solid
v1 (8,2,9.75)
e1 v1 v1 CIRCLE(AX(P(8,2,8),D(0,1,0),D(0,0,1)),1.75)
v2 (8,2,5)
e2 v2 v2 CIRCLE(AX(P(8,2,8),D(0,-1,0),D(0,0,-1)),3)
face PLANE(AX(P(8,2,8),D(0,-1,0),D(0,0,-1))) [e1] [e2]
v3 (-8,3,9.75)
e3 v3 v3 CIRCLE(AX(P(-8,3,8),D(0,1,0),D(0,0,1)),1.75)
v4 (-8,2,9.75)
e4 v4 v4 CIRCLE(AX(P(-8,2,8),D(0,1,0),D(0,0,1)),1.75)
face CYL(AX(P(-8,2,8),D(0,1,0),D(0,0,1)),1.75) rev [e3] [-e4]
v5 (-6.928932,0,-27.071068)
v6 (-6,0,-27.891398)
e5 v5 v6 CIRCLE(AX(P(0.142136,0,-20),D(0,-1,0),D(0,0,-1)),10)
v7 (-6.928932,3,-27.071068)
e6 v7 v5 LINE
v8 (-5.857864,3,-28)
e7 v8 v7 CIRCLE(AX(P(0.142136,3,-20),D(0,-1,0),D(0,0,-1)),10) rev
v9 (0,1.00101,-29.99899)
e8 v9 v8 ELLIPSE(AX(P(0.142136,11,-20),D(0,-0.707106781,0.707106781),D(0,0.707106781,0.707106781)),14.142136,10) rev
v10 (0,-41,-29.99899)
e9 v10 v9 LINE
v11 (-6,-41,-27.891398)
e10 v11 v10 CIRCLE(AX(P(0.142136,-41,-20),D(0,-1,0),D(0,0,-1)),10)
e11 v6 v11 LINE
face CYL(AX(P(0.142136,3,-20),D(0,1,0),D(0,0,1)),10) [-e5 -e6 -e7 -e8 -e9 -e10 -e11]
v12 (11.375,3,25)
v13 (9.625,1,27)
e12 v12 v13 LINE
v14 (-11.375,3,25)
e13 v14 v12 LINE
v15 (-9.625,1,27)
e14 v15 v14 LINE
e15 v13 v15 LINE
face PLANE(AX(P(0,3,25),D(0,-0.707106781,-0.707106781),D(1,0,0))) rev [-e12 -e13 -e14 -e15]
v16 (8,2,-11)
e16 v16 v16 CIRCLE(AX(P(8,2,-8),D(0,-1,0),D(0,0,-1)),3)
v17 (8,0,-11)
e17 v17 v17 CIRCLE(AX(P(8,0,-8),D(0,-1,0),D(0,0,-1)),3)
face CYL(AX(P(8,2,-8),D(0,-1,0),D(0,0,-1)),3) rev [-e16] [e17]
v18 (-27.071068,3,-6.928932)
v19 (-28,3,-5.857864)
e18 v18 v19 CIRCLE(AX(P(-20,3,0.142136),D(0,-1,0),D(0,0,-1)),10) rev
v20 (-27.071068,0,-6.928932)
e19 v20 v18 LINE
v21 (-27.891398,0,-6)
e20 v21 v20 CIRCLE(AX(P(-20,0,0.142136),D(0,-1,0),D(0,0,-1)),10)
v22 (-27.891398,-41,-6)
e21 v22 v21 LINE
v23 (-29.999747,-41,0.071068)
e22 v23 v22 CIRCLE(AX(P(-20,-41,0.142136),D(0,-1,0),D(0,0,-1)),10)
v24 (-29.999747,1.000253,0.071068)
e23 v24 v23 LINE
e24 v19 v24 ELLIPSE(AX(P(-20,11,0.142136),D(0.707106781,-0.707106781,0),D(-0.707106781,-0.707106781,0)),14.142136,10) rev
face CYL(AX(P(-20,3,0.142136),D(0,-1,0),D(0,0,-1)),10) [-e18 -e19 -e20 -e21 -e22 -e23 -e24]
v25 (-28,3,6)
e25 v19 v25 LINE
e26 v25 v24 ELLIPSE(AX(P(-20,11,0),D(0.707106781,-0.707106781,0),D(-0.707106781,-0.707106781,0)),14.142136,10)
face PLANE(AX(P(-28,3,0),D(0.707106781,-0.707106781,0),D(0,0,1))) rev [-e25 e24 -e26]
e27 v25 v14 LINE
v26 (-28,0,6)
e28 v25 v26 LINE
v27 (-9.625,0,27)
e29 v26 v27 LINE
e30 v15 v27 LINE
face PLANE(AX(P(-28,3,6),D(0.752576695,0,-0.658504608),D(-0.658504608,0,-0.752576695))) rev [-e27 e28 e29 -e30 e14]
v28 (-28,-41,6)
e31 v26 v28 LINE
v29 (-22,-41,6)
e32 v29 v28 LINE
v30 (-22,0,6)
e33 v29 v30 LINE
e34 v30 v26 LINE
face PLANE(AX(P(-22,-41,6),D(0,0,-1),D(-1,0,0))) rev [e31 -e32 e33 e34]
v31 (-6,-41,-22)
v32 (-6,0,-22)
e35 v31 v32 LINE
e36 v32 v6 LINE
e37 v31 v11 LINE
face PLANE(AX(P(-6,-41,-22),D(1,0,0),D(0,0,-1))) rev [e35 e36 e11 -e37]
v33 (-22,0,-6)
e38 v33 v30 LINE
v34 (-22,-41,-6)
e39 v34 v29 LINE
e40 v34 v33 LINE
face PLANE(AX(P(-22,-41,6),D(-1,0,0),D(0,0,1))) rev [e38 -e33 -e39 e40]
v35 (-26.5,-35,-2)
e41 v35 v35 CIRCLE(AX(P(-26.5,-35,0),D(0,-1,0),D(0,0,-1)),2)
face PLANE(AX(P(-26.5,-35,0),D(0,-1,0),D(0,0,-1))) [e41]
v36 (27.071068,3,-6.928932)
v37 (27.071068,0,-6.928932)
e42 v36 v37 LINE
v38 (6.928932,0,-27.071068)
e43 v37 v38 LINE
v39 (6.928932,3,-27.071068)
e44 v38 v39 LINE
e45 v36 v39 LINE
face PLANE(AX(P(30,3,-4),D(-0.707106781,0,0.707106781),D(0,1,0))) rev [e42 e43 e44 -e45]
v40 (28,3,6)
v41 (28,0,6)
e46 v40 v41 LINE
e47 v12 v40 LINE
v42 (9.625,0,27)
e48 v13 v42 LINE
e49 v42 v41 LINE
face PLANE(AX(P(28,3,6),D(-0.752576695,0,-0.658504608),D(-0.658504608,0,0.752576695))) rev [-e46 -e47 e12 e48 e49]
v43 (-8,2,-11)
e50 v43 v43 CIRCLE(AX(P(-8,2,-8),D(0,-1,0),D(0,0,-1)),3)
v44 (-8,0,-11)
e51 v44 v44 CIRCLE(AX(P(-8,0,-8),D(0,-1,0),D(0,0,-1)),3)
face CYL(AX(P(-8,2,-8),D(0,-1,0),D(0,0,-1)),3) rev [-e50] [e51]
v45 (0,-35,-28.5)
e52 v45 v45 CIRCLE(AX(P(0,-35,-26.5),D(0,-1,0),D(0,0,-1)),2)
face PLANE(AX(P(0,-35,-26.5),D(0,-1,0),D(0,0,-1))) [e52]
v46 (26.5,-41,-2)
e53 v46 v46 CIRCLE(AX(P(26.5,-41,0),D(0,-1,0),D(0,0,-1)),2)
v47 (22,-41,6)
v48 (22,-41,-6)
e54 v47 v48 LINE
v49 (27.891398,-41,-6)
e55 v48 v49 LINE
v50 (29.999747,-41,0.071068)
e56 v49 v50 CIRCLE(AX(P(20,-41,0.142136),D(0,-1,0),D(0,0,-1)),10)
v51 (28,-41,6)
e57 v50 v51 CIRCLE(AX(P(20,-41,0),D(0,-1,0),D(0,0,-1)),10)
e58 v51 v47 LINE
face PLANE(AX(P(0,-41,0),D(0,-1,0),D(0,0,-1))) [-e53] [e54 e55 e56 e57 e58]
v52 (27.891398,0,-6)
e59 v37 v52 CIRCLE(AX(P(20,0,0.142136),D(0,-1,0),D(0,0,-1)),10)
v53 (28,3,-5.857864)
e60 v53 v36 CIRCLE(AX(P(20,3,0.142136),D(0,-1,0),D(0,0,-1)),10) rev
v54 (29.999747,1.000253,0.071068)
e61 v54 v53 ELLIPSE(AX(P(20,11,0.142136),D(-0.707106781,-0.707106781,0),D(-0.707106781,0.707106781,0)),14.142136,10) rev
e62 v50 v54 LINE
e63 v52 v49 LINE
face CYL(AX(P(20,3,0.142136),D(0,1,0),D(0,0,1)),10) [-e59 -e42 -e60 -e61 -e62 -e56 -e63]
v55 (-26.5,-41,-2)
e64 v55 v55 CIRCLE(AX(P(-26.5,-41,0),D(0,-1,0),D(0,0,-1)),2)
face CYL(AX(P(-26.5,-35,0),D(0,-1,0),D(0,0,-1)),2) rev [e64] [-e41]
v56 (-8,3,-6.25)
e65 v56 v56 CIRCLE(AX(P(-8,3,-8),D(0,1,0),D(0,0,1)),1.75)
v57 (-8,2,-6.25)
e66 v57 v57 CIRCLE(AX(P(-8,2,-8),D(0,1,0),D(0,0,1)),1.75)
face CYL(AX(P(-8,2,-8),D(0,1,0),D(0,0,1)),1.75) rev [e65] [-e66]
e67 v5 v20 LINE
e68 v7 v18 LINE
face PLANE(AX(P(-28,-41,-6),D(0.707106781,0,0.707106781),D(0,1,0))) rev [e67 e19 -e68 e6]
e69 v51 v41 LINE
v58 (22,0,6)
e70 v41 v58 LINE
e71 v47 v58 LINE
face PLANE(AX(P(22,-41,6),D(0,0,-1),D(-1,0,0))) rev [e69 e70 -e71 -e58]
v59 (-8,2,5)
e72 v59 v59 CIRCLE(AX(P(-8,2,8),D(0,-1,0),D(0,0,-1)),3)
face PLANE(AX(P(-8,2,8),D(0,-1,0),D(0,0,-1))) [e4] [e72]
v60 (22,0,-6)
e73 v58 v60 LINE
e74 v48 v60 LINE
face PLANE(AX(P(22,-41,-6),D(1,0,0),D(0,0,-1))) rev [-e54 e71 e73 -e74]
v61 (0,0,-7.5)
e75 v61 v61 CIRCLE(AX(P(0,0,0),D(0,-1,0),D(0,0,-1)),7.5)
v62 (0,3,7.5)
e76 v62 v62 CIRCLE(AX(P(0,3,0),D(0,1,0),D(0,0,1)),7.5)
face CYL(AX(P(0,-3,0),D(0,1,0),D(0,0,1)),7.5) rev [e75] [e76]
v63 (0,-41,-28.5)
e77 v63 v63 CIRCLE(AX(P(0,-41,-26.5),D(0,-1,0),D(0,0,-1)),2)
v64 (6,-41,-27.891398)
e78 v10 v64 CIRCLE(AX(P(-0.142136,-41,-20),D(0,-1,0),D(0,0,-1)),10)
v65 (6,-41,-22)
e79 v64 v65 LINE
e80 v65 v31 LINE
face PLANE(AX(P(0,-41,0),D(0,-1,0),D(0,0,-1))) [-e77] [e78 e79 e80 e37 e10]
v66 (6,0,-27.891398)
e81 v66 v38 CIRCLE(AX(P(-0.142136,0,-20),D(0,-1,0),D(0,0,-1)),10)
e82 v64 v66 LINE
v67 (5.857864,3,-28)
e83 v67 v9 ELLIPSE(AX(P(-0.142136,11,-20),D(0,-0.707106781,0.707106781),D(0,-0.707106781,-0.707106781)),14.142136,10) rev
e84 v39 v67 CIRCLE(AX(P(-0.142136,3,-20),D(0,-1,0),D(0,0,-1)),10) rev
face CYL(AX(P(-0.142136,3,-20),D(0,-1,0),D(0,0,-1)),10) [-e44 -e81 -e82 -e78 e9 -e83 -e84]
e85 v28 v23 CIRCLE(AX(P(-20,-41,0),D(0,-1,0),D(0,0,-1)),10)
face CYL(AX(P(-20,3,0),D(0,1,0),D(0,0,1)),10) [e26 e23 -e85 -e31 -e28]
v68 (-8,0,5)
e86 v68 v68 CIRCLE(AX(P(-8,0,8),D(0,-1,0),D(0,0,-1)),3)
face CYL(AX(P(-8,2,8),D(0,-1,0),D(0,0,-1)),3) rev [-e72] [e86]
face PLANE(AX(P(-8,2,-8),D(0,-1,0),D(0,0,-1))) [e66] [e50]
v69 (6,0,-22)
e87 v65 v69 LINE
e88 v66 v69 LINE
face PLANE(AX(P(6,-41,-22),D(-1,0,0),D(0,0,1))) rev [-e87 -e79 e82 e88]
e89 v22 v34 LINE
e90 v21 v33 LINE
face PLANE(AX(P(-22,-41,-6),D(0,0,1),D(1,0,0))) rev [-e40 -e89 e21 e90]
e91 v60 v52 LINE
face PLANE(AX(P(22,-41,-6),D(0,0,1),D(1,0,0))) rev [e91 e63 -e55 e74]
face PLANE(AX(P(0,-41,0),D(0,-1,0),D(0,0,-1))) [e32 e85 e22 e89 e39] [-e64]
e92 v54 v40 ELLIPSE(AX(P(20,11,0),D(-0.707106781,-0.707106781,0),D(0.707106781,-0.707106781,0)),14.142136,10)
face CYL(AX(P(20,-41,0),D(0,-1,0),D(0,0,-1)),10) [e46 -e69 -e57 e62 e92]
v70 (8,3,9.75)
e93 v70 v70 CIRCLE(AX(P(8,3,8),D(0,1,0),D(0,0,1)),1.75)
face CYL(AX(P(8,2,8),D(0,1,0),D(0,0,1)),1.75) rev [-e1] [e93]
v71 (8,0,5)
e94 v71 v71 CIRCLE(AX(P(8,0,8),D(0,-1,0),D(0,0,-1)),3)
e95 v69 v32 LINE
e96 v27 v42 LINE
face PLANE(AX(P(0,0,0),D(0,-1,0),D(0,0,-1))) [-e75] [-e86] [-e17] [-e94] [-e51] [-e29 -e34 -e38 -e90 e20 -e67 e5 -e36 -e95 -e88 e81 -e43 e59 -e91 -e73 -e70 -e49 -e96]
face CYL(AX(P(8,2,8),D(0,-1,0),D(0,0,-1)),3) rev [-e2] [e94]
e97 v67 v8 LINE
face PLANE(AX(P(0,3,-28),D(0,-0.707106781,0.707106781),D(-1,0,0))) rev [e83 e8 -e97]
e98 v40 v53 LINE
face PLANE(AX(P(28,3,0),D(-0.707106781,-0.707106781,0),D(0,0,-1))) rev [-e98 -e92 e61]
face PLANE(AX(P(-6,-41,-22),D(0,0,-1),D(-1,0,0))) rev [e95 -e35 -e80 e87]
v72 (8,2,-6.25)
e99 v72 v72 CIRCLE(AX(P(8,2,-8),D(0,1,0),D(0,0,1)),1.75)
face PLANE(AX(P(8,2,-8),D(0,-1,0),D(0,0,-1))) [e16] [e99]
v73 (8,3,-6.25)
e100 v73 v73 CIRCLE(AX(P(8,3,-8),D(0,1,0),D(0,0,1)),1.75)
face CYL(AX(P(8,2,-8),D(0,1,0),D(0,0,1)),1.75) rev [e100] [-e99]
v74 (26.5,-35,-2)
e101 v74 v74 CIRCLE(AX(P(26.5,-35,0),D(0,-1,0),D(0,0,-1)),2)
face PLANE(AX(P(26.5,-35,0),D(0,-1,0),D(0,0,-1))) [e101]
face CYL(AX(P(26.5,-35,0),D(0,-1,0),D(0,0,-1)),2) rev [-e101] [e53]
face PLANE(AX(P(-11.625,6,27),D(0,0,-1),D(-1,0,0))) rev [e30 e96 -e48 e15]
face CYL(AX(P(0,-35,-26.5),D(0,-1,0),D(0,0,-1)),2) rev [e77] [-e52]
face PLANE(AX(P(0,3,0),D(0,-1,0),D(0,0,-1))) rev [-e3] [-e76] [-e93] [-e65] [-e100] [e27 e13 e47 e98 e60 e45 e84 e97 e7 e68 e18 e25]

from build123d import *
from build123d.topology import SkipClean

# Parameters (mm, degrees)
SKETCH1_W           = 60
SKETCH1_H           = 60
BOSS_EXTRUDE1_DEPTH = 3
SKETCH4_W           = 8
SKETCH4_H           = 12
SKETCH4_W_2         = 12
SKETCH4_H_2         = 8
BOSS_EXTRUDE3_DEPTH = 41
SKETCH5_R           = 2
CUT_EXTRUDE2_DEPTH  = 6
SKETCH8_R           = 7.5
CUT_EXTRUDE4_DEPTH  = 6
CUT_EXTRUDE5_DEPTH  = 6
CUT_EXTRUDE6_DEPTH  = 6
SKETCH11_W          = 23.25
SKETCH11_H          = 3
CUT_EXTRUDE7_DEPTH  = 6
SKETCH12_R          = 3
CUT_EXTRUDE8_DEPTH  = 2
SKETCH13_R          = 1.75
CUT_EXTRUDE9_DEPTH  = 1
CHAMFER1_SIZE       = 2
CHAMFER2_SIZE       = 2
CHAMFER3_SIZE       = 2
CUT_EXTRUDE10_DEPTH = 10
FILLET1_R           = 10
CUT_EXTRUDE11_DEPTH = 59.999486357


with BuildPart() as part:
    # Sketch1 → Boss-Extrude1 (new body)
    with BuildSketch(Plane(origin=(0, 0, 0), x_dir=(1, 0, 0), z_dir=(0, 1, 0))):
        Rectangle(SKETCH1_W, SKETCH1_H)
    extrude(amount=BOSS_EXTRUDE1_DEPTH)

    # Sketch4 → Boss-Extrude3 (add)
    with BuildSketch(Plane.XZ):
        with Locations((-26, 0)):
            Rectangle(SKETCH4_W, SKETCH4_H)
        with Locations((0, -26)):
            Rectangle(SKETCH4_W_2, SKETCH4_H_2)
        with Locations((26, 0)):
            Rectangle(SKETCH4_W, SKETCH4_H)
    extrude(amount=BOSS_EXTRUDE3_DEPTH)

    # Sketch5 → Cut-Extrude2 (cut)
    with BuildSketch(Plane.XZ.offset(41)):
        with Locations(Location((0, -26.5, 0), (0, 0, 270))):
            Circle(SKETCH5_R)
        with Locations(Location((-26.5, 0, 0), (0, 0, 270))):
            Circle(SKETCH5_R)
        with Locations(Location((26.5, 0, 0), (0, 0, 270))):
            Circle(SKETCH5_R)
    extrude(amount=-CUT_EXTRUDE2_DEPTH, mode=Mode.SUBTRACT)

    # Sketch8 → Cut-Extrude4 (cut)
    with BuildSketch(Plane(origin=(0, 3, 0), x_dir=(1, 0, 0), z_dir=(0, 1, 0))):
        with Locations(Location((0, 0, 0), (0, 0, 270))):
            Circle(SKETCH8_R)
    extrude(amount=-CUT_EXTRUDE4_DEPTH, mode=Mode.SUBTRACT)

    # Sketch7 → Cut-Extrude5 (cut)
    with BuildSketch(Plane.XZ):
        Polygon((-30, -6), (-6, -30), (-30, -30), align=None)
        Polygon((30, -6), (6, -30), (30, -30), align=None)
    extrude(amount=-CUT_EXTRUDE5_DEPTH, mode=Mode.SUBTRACT)

    # Sketch10 → Cut-Extrude6 (cut)
    with BuildSketch(Plane.XZ):
        Polygon((-9, 30), (-30, 6), (-30, 30), align=None)
        Polygon((9, 30), (30, 6), (30, 30), align=None)
    extrude(amount=-CUT_EXTRUDE6_DEPTH, mode=Mode.SUBTRACT)

    # Sketch11 → Cut-Extrude7 (cut)
    with BuildSketch(Plane.XZ):
        with Locations((0, 28.5)):
            Rectangle(SKETCH11_W, SKETCH11_H)
    extrude(amount=-CUT_EXTRUDE7_DEPTH, mode=Mode.SUBTRACT)

    # Sketch12 → Cut-Extrude8 (cut)
    with BuildSketch(Plane.XZ):
        with Locations(Location((-8, 8, 0), (0, 0, 270))):
            Circle(SKETCH12_R)
        with Locations(Location((8, 8, 0), (0, 0, 270))):
            Circle(SKETCH12_R)
        with Locations(Location((8, -8, 0), (0, 0, 270))):
            Circle(SKETCH12_R)
        with Locations(Location((-8, -8, 0), (0, 0, 270))):
            Circle(SKETCH12_R)
    extrude(amount=-CUT_EXTRUDE8_DEPTH, mode=Mode.SUBTRACT)

    # Sketch13 → Cut-Extrude9 (cut)
    with BuildSketch(Plane(origin=(0, 3, 0), x_dir=(1, 0, 0), z_dir=(0, 1, 0))):
        with Locations(Location((-8, 8, 0), (0, 0, 270))):
            Circle(SKETCH13_R)
        with Locations(Location((8, 8, 0), (0, 0, 270))):
            Circle(SKETCH13_R)
        with Locations(Location((8, -8, 0), (0, 0, 270))):
            Circle(SKETCH13_R)
        with Locations(Location((-8, -8, 0), (0, 0, 270))):
            Circle(SKETCH13_R)
    extrude(amount=-CUT_EXTRUDE9_DEPTH, mode=Mode.SUBTRACT)

    # Chamfer1
    chamfer1_edges = [part.edges().sort_by_distance(p)[0] for p in [
        (30, 3, 0),
        (0, 3, -30),
        (-30, 3, 0),
    ]]
    chamfer(chamfer1_edges, length=CHAMFER1_SIZE)

    # Chamfer2
    chamfer2_edges = [part.edges().sort_by_distance(p)[0] for p in [
        (0, 3, 27),
    ]]
    chamfer(chamfer2_edges, length=CHAMFER2_SIZE)

    # Chamfer3
    chamfer3_edges = [part.edges().sort_by_distance(p)[0] for p in [
        (6, -20.5, -30),
        (-6, -20.5, -30),
        (-30, -20.5, -6),
        (-30, -20.5, 6),
        (30, -20.5, 6),
        (30, -20.5, -6),
    ]]
    chamfer(chamfer3_edges, length=CHAMFER3_SIZE)

    # Sketch14 → Cut-Extrude10 (cut)
    with BuildSketch(Plane.XZ):
        Polygon((-30, -4), (-4, -30), (-6, -30), (-30, -6), align=None)
        Polygon((4, -30), (30, -4), (30, -6), (6, -30), align=None)
    extrude(amount=-CUT_EXTRUDE10_DEPTH, mode=Mode.SUBTRACT)

    # Fillet1
    # the kernel refuses this fillet: 10 mm, written as the material it takes off along each edge
    with BuildSketch(Plane(origin=(-4, 11.355339059, -30), x_dir=(1, 0, 0), z_dir=(0, -1, 0)), Plane(origin=(4, -51.355339059, -30), x_dir=(-1, 0, 0), z_dir=(0, 1, 0)), Plane(origin=(30, 11.355339059, -4), x_dir=(0, 0, 1), z_dir=(0, -1, 0))) as fillet1_piece_1:
        with BuildLine():
            CenterArc((FILLET1_R * 0.414213562373, FILLET1_R), FILLET1_R, 225, 45)
            Line((-FILLET1_R * 0.292893218813, FILLET1_R * 0.292893218813), (0, 0))
            Line((0, 0), (FILLET1_R * 0.414213562373, 0))
        make_face()
    extrude(amount=62.710678119, mode=Mode.SUBTRACT)
    with BuildSketch(Plane(origin=(-30, 0, 4), x_dir=(0, 0, -1), z_dir=(0, -1, 0))) as fillet1_piece_2:
        with BuildLine():
            CenterArc((4, 10), FILLET1_R, 233.130102354, 36.869897646)
            Line((-2, 2), (0, 0))
            Line((0, 0), (4, 0))
        make_face()
    extrude(amount=51, mode=Mode.SUBTRACT)
    with BuildSketch(Plane(origin=(-30, 11.355339059, -4), x_dir=(0, 0, 1), z_dir=(0, -1, 0))) as fillet1_piece_3:
        with BuildLine():
            CenterArc((FILLET1_R * 0.414213562373, -FILLET1_R), FILLET1_R, 90, 45)
            Line((-FILLET1_R * 0.292893218813, -FILLET1_R * 0.292893218813), (0, 0))
            Line((0, 0), (FILLET1_R * 0.414213562373, 0))
        make_face()
    extrude(amount=62.710678119, mode=Mode.SUBTRACT)
    with BuildSketch(Plane(origin=(30, 0, 4), x_dir=(0, 0, -1), z_dir=(0, -1, 0))) as fillet1_piece_4:
        with BuildLine():
            CenterArc((4, -10), FILLET1_R, 90, 36.869897646)
            Line((-2, -2), (0, 0))
            Line((0, 0), (4, 0))
        make_face()
    extrude(amount=51, mode=Mode.SUBTRACT)

    # Sketch16 → Cut-Extrude11 (cut, through all)
    with SkipClean():  # the faces are left unmerged after this step: merging them gives an invalid solid
        with BuildSketch(Plane.XZ):
            with BuildLine():
                Line((-28, 6), (-9.625, 27))
                Line((-9.625, 27), (-11.625, 27))
                Line((-11.625, 27), (-30, 6))
                Line((-30, 6), (-30, 0.142135624))
                ThreePointArc((-30, 0.142135624), (-29.999936866, 0.106601493), (-29.999747465, 0.071067812))
                ThreePointArc((-29.999747465, 0.071067812), (-29.475536208, 3.195968331), (-28, 6))
            make_face()
            with BuildLine():
                Line((28, 6), (9.625, 27))
                Line((9.625, 27), (11.625, 27))
                Line((11.625, 27), (30, 6))
                Line((30, 6), (30, 0.142135624))
                ThreePointArc((30, 0.142135624), (29.999936866, 0.106601493), (29.999747465, 0.071067812))
                ThreePointArc((29.999747465, 0.071067812), (29.475536208, 3.195968331), (28, 6))
            make_face()
        extrude(amount=-CUT_EXTRUDE11_DEPTH, mode=Mode.SUBTRACT)


solid = part.part
